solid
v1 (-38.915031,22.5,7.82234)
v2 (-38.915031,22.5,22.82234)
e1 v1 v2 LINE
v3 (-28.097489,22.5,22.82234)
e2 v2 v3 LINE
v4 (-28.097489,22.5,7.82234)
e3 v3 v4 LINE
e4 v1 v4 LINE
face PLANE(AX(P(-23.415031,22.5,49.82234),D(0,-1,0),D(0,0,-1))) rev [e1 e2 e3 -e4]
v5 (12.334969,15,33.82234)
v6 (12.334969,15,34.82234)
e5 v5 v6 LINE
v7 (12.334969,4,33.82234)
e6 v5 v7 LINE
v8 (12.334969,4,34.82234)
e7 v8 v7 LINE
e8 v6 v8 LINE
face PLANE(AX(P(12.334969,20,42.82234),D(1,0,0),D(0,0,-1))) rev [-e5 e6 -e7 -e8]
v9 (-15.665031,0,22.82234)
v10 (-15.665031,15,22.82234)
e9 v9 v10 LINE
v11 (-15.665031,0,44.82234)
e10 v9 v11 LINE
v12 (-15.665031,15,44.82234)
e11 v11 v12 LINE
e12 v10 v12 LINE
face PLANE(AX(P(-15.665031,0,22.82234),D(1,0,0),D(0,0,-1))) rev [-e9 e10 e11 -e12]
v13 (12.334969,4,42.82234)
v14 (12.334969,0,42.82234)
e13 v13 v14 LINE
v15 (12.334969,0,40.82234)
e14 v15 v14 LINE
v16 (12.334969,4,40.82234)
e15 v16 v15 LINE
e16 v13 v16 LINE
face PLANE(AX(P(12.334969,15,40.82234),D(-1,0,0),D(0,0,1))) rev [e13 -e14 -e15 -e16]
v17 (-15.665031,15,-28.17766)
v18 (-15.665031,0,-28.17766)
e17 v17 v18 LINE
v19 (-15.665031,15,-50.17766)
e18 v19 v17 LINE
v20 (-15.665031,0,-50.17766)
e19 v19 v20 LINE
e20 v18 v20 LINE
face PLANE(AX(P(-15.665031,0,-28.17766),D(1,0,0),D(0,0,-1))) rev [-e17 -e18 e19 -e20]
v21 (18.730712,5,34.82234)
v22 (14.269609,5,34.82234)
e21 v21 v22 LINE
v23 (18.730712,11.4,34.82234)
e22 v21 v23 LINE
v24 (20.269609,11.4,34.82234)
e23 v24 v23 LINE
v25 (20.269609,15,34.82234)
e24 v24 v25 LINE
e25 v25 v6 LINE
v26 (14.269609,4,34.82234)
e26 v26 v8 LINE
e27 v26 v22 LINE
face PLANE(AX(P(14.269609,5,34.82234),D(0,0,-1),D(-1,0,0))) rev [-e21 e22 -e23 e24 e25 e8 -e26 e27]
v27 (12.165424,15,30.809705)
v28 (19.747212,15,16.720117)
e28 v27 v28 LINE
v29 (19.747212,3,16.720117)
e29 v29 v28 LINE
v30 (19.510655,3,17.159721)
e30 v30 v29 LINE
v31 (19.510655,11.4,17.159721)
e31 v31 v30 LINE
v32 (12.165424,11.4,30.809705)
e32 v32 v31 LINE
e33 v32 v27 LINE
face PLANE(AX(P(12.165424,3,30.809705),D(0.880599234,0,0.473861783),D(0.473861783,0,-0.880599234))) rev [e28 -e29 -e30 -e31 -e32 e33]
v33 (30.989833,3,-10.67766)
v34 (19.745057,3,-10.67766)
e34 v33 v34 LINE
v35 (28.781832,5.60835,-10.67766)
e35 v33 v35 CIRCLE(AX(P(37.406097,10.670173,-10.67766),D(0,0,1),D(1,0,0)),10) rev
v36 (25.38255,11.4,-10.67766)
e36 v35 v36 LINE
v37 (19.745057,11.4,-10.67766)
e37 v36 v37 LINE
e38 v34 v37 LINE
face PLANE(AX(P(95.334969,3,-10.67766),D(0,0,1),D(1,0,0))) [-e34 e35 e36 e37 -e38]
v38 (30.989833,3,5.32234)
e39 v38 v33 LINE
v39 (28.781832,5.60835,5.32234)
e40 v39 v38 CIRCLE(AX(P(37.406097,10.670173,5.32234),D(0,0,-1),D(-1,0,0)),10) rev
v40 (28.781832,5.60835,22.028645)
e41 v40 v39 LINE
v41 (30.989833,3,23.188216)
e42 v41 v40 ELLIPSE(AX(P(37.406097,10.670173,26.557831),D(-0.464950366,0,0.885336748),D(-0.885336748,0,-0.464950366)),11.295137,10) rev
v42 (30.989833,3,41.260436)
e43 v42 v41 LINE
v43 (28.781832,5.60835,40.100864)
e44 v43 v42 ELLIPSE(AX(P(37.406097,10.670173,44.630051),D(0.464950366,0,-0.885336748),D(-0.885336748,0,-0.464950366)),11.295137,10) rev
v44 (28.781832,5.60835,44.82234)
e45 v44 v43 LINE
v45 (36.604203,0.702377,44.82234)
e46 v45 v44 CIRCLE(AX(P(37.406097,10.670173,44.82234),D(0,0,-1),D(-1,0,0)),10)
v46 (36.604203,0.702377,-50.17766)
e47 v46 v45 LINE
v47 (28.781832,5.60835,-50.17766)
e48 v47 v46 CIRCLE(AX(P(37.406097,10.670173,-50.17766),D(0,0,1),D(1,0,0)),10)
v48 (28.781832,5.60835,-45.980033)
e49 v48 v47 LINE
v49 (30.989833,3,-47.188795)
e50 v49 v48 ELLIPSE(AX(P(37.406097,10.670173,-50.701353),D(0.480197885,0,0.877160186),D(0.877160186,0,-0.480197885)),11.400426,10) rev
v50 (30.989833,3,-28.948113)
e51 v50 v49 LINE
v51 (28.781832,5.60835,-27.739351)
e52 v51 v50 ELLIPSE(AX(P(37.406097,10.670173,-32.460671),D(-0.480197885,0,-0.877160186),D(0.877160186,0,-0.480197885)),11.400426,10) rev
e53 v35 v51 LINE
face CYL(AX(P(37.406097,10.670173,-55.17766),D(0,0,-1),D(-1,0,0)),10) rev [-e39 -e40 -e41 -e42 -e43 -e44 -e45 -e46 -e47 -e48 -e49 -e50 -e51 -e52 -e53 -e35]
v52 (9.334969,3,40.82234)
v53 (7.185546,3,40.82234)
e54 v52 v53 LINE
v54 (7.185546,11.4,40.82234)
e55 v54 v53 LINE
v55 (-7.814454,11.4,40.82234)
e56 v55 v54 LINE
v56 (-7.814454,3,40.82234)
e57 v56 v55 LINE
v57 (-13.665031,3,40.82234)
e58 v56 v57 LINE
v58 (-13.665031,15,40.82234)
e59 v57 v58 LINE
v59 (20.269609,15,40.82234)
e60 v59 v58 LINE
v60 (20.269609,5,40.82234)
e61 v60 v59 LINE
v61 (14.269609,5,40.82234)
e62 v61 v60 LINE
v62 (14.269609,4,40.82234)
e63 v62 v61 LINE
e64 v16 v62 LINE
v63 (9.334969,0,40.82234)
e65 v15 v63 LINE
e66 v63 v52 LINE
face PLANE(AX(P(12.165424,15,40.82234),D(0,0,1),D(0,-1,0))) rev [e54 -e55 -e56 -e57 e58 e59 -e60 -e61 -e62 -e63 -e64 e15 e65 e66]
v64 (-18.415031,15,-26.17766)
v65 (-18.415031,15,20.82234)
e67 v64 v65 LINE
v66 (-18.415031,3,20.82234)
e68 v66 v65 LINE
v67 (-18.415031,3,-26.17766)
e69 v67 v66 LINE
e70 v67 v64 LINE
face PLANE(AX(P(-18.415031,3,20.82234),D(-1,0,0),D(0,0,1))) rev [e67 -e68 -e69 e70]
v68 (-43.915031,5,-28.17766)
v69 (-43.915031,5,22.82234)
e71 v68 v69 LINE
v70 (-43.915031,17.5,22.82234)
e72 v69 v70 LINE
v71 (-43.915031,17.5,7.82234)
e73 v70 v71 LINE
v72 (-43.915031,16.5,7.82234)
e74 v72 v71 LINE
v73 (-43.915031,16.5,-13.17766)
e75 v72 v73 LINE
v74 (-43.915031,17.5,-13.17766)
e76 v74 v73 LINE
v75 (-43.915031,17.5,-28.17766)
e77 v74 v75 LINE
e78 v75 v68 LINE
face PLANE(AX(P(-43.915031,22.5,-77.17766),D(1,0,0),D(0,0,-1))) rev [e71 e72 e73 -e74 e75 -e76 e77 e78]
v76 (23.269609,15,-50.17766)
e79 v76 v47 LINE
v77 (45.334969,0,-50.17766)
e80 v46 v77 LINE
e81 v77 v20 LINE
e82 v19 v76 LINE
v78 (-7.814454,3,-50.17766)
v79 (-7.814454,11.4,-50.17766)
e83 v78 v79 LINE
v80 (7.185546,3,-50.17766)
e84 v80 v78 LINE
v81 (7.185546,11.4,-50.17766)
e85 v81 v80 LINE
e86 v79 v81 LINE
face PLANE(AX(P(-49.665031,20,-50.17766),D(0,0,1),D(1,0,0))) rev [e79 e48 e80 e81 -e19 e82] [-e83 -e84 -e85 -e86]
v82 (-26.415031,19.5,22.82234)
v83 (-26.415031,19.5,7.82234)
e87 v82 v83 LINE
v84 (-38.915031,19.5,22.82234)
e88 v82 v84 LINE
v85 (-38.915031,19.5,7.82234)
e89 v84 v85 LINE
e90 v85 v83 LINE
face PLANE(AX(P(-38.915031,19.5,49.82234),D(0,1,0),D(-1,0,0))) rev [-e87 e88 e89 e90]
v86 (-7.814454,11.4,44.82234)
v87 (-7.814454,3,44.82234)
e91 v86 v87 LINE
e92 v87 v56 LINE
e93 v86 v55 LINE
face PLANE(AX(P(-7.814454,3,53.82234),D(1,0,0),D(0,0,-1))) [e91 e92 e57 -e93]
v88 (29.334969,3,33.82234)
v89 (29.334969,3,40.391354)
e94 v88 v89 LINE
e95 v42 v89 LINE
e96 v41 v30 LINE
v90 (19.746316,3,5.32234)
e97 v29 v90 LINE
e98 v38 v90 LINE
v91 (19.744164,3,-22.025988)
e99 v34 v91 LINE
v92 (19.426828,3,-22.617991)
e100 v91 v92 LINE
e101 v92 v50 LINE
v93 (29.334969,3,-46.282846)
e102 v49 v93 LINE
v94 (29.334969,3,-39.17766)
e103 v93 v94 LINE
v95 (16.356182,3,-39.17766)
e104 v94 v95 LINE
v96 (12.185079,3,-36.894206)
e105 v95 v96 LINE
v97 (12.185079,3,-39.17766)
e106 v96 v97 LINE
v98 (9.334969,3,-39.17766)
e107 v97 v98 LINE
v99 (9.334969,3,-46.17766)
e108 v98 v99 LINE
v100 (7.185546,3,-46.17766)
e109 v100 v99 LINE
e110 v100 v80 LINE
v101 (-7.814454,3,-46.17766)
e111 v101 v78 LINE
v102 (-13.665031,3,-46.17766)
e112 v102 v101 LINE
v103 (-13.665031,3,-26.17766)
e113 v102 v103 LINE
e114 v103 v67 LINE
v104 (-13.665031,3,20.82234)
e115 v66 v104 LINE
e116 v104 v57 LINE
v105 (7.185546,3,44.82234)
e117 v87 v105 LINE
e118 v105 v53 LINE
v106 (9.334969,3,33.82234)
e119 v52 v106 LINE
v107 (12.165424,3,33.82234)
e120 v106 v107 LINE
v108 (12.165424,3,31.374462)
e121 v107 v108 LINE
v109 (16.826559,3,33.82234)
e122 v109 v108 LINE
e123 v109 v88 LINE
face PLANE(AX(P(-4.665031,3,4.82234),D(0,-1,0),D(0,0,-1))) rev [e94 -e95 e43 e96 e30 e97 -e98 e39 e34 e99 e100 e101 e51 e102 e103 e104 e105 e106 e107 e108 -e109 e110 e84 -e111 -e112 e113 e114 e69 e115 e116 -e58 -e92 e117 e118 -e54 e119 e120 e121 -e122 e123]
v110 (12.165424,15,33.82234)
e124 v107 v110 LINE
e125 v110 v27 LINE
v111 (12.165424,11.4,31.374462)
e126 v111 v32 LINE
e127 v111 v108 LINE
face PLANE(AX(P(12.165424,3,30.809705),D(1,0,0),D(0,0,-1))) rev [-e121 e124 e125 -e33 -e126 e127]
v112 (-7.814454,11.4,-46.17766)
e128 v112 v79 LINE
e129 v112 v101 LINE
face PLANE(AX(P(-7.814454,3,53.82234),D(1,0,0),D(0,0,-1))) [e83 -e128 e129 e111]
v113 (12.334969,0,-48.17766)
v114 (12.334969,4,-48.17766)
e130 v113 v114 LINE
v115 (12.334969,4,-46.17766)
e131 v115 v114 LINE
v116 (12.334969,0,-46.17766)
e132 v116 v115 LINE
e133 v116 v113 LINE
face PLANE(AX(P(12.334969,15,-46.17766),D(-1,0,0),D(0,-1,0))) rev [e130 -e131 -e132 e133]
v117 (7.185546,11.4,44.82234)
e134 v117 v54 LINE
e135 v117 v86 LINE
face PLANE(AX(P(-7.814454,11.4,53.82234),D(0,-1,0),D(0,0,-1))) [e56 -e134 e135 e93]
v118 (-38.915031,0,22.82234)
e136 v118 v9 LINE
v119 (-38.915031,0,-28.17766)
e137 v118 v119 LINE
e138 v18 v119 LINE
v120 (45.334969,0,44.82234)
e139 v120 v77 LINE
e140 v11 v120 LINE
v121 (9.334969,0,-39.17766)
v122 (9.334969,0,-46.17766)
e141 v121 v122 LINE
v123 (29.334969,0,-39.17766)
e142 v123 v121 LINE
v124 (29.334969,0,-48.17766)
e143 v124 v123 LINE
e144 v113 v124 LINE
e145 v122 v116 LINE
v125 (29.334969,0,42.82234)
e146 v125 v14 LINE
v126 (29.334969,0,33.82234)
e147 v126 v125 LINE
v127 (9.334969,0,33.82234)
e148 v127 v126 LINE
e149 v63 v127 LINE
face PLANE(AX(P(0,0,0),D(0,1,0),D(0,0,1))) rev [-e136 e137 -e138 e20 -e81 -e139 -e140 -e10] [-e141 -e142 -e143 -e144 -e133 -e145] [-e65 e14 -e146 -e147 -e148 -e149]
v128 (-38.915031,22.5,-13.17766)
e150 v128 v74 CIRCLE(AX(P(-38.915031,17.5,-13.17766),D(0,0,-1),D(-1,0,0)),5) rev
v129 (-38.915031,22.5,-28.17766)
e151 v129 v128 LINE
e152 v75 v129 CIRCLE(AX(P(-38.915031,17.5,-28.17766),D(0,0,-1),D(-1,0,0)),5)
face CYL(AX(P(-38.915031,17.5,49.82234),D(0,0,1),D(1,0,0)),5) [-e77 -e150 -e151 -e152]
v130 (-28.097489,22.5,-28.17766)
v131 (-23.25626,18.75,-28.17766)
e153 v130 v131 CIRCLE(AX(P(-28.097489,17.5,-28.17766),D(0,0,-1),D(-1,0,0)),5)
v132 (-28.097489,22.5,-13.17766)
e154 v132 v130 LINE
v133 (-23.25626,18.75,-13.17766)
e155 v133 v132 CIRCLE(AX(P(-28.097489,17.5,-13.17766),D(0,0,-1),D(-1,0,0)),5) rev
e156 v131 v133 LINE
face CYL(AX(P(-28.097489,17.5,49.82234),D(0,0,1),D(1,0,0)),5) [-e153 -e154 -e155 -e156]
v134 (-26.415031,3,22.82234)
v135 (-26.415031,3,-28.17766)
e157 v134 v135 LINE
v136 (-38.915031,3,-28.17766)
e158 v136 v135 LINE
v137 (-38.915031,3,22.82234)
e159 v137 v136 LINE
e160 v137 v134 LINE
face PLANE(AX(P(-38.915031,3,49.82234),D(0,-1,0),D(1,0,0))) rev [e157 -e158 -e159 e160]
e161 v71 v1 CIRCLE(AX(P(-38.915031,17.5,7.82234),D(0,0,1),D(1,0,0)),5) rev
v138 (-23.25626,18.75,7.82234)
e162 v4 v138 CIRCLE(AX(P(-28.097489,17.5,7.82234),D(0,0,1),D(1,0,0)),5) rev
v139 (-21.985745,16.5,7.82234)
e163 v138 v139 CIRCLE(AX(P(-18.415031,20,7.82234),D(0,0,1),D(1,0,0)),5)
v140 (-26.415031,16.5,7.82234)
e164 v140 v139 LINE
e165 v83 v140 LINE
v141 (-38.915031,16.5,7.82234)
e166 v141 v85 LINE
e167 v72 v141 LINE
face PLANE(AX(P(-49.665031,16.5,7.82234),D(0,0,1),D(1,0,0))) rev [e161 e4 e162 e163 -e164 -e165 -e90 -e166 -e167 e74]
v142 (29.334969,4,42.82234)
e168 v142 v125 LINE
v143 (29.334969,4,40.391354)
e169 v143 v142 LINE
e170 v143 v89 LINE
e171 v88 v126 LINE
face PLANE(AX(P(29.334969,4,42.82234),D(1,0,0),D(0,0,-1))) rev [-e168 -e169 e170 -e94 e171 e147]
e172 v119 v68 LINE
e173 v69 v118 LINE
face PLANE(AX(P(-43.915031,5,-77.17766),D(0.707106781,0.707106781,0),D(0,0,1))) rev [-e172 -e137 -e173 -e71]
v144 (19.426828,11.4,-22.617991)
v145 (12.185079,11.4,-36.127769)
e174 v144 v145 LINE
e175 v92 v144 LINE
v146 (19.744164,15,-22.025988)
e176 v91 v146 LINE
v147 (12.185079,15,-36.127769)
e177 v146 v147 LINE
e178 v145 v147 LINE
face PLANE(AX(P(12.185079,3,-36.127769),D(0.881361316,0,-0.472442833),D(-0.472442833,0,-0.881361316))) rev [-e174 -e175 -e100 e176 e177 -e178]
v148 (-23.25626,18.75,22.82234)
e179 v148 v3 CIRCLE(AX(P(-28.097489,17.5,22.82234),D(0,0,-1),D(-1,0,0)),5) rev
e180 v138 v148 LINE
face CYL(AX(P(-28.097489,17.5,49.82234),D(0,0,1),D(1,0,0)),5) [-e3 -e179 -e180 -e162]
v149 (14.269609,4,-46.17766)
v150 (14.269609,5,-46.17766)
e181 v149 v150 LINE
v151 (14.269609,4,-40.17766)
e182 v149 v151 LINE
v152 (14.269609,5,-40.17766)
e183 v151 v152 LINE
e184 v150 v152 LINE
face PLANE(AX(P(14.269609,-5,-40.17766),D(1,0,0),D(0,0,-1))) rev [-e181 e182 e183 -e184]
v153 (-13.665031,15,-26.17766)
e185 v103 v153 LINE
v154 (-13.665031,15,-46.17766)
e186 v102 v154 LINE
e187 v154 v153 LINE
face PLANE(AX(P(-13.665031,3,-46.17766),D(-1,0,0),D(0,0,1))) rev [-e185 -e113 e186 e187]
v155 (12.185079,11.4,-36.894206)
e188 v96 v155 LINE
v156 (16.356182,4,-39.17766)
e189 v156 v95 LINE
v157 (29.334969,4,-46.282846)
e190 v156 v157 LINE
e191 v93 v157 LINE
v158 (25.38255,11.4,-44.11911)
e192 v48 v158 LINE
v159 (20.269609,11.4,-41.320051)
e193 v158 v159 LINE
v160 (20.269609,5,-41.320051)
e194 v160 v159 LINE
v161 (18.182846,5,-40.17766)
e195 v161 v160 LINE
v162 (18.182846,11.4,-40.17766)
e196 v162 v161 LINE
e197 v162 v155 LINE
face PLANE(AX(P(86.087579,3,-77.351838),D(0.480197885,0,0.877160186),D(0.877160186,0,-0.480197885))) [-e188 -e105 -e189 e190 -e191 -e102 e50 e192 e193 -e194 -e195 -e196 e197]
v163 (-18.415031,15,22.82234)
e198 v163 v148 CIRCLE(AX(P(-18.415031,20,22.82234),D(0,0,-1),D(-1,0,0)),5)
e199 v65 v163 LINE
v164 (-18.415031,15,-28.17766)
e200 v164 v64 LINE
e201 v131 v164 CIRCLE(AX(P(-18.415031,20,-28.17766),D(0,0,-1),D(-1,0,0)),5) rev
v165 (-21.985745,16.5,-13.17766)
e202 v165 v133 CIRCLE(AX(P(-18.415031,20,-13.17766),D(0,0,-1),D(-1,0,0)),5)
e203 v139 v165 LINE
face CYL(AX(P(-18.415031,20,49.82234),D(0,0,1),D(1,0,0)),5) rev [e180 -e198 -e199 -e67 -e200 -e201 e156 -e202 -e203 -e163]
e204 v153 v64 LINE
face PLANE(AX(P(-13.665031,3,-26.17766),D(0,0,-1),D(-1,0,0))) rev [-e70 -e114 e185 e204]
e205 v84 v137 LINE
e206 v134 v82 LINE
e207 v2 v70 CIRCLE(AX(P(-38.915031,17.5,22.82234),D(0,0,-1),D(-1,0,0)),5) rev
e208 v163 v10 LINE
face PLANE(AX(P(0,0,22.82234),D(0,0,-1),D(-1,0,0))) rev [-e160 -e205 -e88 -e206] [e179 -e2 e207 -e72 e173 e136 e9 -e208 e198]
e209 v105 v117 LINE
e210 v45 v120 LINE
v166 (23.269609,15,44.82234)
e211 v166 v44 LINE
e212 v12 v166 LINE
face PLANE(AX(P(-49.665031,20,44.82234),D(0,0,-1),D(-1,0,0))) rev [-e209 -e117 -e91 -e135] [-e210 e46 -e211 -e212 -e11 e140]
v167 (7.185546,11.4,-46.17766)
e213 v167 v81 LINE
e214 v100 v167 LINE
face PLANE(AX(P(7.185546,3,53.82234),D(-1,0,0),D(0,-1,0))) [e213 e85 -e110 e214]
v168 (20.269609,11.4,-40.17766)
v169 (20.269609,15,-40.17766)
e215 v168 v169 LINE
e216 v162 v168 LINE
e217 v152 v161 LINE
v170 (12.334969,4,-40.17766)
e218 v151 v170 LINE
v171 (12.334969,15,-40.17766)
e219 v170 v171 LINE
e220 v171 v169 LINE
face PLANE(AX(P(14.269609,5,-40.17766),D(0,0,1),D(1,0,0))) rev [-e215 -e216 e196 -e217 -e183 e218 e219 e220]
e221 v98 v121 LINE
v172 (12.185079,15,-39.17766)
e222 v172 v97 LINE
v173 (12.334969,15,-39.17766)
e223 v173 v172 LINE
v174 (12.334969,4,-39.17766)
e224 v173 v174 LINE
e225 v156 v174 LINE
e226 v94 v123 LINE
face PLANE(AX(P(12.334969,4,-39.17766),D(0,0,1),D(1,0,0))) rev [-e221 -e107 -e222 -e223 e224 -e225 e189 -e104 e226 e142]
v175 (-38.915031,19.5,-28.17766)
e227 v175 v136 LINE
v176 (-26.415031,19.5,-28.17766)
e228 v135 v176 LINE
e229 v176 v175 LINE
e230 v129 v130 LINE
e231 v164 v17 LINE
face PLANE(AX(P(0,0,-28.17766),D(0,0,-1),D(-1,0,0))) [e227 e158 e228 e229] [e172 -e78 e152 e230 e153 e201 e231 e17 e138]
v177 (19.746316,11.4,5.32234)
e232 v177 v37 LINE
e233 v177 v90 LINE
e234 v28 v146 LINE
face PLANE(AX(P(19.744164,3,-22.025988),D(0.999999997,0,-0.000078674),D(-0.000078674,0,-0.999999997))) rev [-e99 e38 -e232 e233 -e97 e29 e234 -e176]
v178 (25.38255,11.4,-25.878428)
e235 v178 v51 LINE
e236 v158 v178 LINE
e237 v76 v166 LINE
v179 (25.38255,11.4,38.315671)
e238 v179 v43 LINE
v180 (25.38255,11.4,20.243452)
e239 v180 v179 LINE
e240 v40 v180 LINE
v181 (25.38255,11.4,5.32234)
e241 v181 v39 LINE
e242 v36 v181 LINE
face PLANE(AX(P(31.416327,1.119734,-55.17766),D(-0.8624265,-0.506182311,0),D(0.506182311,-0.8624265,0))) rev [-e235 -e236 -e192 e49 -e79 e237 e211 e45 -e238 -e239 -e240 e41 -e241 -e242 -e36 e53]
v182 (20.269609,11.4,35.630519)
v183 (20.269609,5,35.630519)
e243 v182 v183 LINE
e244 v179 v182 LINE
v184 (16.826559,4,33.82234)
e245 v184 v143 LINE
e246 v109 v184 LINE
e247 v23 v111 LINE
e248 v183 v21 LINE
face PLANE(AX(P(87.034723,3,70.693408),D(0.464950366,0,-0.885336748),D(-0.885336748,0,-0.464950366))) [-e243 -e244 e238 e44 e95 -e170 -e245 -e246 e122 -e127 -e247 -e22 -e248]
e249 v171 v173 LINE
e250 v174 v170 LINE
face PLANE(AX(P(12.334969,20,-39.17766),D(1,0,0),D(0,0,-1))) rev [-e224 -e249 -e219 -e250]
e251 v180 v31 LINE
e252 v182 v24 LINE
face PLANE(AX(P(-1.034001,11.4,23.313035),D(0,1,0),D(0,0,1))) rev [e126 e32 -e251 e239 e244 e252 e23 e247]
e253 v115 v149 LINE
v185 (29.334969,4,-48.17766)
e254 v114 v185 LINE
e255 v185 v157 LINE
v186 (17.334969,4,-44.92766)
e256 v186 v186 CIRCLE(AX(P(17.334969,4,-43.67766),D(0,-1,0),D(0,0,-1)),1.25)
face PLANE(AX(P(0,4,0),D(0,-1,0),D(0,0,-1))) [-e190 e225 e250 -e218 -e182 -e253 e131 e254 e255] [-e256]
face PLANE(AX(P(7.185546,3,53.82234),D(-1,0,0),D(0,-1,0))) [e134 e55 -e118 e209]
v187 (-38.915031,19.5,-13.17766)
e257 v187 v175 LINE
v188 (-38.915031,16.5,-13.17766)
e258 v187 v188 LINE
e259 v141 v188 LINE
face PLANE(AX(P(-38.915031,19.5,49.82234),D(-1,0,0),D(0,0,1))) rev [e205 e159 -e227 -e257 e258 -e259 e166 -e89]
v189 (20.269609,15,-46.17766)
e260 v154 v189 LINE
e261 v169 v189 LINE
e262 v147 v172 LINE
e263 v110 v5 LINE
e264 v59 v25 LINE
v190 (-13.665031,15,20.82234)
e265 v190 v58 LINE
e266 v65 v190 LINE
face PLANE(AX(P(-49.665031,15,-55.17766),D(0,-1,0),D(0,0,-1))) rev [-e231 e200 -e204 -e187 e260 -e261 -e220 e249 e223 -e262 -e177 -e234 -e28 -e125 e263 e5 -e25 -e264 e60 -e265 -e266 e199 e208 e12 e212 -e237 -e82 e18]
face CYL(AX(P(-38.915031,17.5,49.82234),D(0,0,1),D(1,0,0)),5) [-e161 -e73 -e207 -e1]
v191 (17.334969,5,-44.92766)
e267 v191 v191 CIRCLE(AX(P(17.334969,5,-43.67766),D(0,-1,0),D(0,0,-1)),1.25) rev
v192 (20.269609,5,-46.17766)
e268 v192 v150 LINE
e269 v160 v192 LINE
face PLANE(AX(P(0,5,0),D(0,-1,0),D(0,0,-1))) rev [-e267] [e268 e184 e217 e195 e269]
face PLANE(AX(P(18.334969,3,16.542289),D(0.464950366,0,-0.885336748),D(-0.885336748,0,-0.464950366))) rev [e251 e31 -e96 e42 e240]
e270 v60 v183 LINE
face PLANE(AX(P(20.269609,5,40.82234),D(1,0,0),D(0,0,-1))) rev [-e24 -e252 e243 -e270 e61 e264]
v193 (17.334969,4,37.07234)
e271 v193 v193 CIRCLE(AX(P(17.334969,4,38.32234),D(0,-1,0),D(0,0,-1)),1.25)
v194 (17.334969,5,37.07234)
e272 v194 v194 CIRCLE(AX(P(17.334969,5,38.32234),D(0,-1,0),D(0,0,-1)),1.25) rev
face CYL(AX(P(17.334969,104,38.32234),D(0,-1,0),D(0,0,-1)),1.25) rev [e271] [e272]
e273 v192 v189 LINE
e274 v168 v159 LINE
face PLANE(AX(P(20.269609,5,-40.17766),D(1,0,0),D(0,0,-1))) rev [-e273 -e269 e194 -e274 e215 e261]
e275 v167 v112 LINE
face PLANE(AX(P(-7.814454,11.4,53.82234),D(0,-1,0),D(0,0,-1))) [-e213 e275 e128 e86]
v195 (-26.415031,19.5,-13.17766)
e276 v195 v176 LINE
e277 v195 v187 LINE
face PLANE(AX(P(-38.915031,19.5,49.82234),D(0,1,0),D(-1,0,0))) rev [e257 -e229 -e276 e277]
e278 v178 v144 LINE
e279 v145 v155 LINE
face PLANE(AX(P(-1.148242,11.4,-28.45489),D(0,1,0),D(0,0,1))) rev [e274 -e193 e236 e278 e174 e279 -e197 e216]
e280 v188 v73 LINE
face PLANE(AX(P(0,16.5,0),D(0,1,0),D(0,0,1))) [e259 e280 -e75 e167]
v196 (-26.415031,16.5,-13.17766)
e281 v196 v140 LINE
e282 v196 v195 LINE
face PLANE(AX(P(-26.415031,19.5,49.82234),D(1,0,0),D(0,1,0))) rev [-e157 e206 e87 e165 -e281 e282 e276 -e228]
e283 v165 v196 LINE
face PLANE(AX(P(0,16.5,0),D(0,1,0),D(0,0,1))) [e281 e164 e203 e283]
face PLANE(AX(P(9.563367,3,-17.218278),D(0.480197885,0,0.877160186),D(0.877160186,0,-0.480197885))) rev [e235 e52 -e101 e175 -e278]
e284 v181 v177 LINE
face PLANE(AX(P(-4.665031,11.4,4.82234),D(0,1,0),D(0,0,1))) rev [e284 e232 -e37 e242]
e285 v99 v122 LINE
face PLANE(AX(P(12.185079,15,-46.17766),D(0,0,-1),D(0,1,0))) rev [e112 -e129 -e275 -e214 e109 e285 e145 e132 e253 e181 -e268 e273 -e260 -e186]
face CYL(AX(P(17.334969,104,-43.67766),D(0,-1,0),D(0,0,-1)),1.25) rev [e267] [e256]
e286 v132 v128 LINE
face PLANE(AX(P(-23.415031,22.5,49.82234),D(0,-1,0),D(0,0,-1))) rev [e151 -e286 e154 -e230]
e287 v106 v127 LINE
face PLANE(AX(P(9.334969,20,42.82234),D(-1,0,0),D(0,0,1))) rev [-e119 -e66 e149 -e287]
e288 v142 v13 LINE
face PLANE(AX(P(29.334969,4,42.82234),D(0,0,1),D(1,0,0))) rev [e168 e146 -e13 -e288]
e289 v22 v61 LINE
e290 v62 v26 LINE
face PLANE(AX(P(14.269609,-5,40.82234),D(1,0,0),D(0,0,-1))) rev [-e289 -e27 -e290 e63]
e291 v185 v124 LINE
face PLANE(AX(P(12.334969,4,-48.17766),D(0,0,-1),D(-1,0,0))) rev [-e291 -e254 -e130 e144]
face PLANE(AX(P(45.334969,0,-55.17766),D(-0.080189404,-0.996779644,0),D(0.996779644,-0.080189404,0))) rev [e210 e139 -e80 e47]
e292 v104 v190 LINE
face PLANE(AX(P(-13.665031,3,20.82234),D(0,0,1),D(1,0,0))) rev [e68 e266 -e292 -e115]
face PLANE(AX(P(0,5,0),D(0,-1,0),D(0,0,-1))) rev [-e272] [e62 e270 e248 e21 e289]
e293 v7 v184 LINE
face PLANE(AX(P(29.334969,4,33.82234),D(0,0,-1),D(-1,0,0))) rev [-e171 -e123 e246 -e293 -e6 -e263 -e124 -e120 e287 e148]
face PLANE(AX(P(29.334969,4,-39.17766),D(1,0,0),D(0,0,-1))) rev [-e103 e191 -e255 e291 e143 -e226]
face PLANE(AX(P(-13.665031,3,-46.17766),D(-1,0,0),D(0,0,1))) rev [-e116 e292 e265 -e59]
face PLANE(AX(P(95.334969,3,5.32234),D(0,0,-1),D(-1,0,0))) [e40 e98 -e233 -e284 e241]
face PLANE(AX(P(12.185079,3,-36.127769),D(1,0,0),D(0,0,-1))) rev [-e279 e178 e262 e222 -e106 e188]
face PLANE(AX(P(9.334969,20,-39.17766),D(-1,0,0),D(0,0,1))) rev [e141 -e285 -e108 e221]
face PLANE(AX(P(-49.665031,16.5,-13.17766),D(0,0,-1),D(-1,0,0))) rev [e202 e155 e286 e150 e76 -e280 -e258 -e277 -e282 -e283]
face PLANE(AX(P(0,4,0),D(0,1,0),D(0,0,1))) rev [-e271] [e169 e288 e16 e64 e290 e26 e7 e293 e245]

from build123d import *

# Parameters (mm, degrees)
SKETCH1_W                = 95
SKETCH1_H                = 95
BOSS_EXTRUDE1_DEPTH      = 20
SKETCH2_W                = 15
SKETCH2_H                = 8.4
CUT_EXTRUDE1_DEPTH       = 50
CUT_EXTRUDE3_DEPTH       = 100
FILLET1_R                = 10
CUT_EXTRUDE4_DEPTH       = 17
SKETCH8_W                = 15
SKETCH8_H                = 8.4
CUT_EXTRUDE5_DEPTH       = 4
SKETCH9_W                = 15
SKETCH9_H                = 8.4
CUT_EXTRUDE6_DEPTH       = 4
SKETCH10_W               = 15
SKETCH10_H               = 8.4
CUT_EXTRUDE7_DEPTH       = 100
SKETCH11_W               = 15
SKETCH11_H               = 8.4
CUT_EXTRUDE8_DEPTH       = 100
SKETCH12_W               = 96.22761595
SKETCH12_H               = 5
CUT_EXTRUDE9_DEPTH       = 100
SKETCH14_W               = 16
SKETCH14_H               = 8.4
CUT_EXTRUDE10_DEPTH      = 100
SKETCH15_W               = 16
SKETCH15_H               = 8.4
CUT_EXTRUDE11_DEPTH      = 100
SKETCH16_W               = 16
SKETCH16_H               = 8.4
CUT_EXTRUDE13_DEPTH      = 100
CUT_EXTRUDE16_DEPTH      = 12
SKETCH21_W               = 23.779532914
SKETCH21_H               = 2
BOSS_EXTRUDE2_DEPTH      = 12
SKETCH23_W               = 23.759878039
SKETCH23_H               = 2
BOSS_EXTRUDE3_DEPTH      = 12
CUT_EXTRUDE19_DEPTH      = 100
CUT_EXTRUDE19_DEPTH_BACK = 100
SKETCH24_W               = 15
SKETCH24_H               = 8.4
SKETCH26_W               = 20
SKETCH26_H               = 95
BOSS_EXTRUDE4_DEPTH      = 20
SKETCH31_W               = 95
SKETCH31_H               = 20
BOSS_EXTRUDE6_DEPTH      = 10
SKETCH32_W               = 12.5
SKETCH32_H               = 16.5
CUT_EXTRUDE22_DEPTH      = 100
SKETCH33_W               = 3.75
SKETCH33_H               = 20
CUT_EXTRUDE23_DEPTH      = 100
SKETCH34_W               = 26.25
SKETCH34_H               = 12.5
CUT_EXTRUDE24_DEPTH      = 100
SKETCH35_W               = 34
SKETCH35_H               = 47.07285681
CUT_EXTRUDE25_DEPTH      = 22
SKETCH36_W               = 34
SKETCH36_H               = 30.604426896
CUT_EXTRUDE26_DEPTH      = 22
SKETCH37_W               = 26.25
SKETCH37_H               = 21
CUT_EXTRUDE28_DEPTH      = 6
SKETCH38_W               = 5.75
SKETCH38_H               = 22.5
CUT_EXTRUDE29_DEPTH      = 100
CHAMFER1_SIZE            = 5
SKETCH39_W               = 2.070576792
SKETCH39_H               = 87
CUT_EXTRUDE30_DEPTH      = 12
FILLET4_R                = 5
FILLET5_R                = 5
SKETCH40_W               = 4.75
SKETCH40_H               = 47
CUT_EXTRUDE31_DEPTH      = 12
FILLET6_R                = 5
SKETCH46_W               = 17
SKETCH46_H               = 9
CUT_EXTRUDE36_DEPTH      = 4
SKETCH47_R               = 1.25
CUT_EXTRUDE37_DEPTH      = 100
SKETCH48_W               = 6
SKETCH48_H               = 6
CUT_EXTRUDE40_DEPTH      = 10
SKETCH49_W               = 2.104185464
SKETCH49_H               = 6
SKETCH49_W_2             = 2.084530589
CUT_EXTRUDE41_DEPTH      = 20
SKETCH50_W               = 3
SKETCH50_H               = 9
CUT_EXTRUDE42_DEPTH      = 20
SKETCH51_W               = 3
SKETCH51_H               = 15
BOSS_EXTRUDE7_DEPTH      = 2
SKETCH52_W               = 3
SKETCH52_H               = 15
BOSS_EXTRUDE8_DEPTH      = 2


with BuildPart() as part:
    # Sketch1 → Boss-Extrude1 (new body)
    with BuildSketch(Plane(origin=(0, 0, 0), x_dir=(1, 0, 0), z_dir=(0, 1, 0))):
        with Locations((-2.165031067, 2.677660124)):
            Rectangle(SKETCH1_W, SKETCH1_H)
    extrude(amount=BOSS_EXTRUDE1_DEPTH)

    # Sketch2 → Cut-Extrude1 (cut)
    with BuildSketch(Plane(origin=(45.334968933, 0, 0), x_dir=(0, 0, -1), z_dir=(1, 0, 0))):
        with Locations((2.677660124, 7.2)):
            Rectangle(SKETCH2_W, SKETCH2_H)
    extrude(amount=-CUT_EXTRUDE1_DEPTH, mode=Mode.SUBTRACT)

    # Sketch6 → Cut-Extrude3 (cut)
    with BuildSketch(Plane.XY.offset(44.822339876)):
        Polygon((45.334968933, 0), (31.416327077, 1.119733542), (20.334968933, 20), (45.334968933, 20), align=None)
    extrude(amount=-CUT_EXTRUDE3_DEPTH, mode=Mode.SUBTRACT)

    # Fillet1
    # the kernel refuses this fillet: 10 mm, written as the material it adds along each edge
    with BuildSketch(Plane(origin=(31.416327077, 1.119733542, 44.822339876), x_dir=(0.9967796443594351, -0.08018940447888392, 0), z_dir=(0, 0, -1))) as fillet1_piece_1_section:
        with BuildLine():
            CenterArc((FILLET1_R * 0.52046366993, -FILLET1_R), FILLET1_R, 90, 54.990678882)
            Line((-FILLET1_R * 0.298595051697, -FILLET1_R * 0.426290308146), (0, 0))
            Line((0, 0), (FILLET1_R * 0.52046366993, 0))
        make_face()
    fillet1_piece_1 = extrude(amount=95, mode=Mode.PRIVATE)
    fillet1_piece_1 = split(fillet1_piece_1, bisect_by=Plane(origin=(32.462514907, 1.548685907, 4.822339876), z_dir=(0, 0, 1)), keep=Keep.TOP, mode=Mode.PRIVATE)
    fillet1_piece_1 = split(fillet1_piece_1, bisect_by=Plane(origin=(32.462514907, 3, 24.822339876), z_dir=(0, -1, 0)), keep=Keep.TOP, mode=Mode.PRIVATE)
    add(fillet1_piece_1)
    with BuildSketch(Plane(origin=(31.416327077, 1.119733542, 44.822339876), x_dir=(0.9967796443594351, -0.08018940447888392, 0), z_dir=(0, 0, -1))) as fillet1_piece_2_section:
        with BuildLine():
            CenterArc((FILLET1_R * 0.52046366993, -FILLET1_R), FILLET1_R, 90, 54.990678882)
            Line((-FILLET1_R * 0.298595051697, -FILLET1_R * 0.426290308146), (0, 0))
            Line((0, 0), (FILLET1_R * 0.52046366993, 0))
        make_face()
    fillet1_piece_2 = extrude(amount=95, mode=Mode.PRIVATE)
    fillet1_piece_2 = split(fillet1_piece_2, bisect_by=Plane(origin=(29.780943428, 3.965739863, 4.822339876), z_dir=(0, 0, 1)), keep=Keep.TOP, mode=Mode.PRIVATE)
    fillet1_piece_2 = split(fillet1_piece_2, bisect_by=Plane(origin=(29.780943428, 3, 24.822339876), z_dir=(0, 1, 0)), keep=Keep.TOP, mode=Mode.PRIVATE)
    add(fillet1_piece_2)
    with BuildSketch(Plane(origin=(31.416327077, 1.119733542, 44.822339876), x_dir=(0.9967796443594351, -0.08018940447888392, 0), z_dir=(0, 0, -1))) as fillet1_piece_3_section:
        with BuildLine():
            CenterArc((FILLET1_R * 0.52046366993, -FILLET1_R), FILLET1_R, 90, 54.990678882)
            Line((-FILLET1_R * 0.298595051697, -FILLET1_R * 0.426290308146), (0, 0))
            Line((0, 0), (FILLET1_R * 0.52046366993, 0))
        make_face()
    fillet1_piece_3 = extrude(amount=95, mode=Mode.PRIVATE)
    fillet1_piece_3 = split(fillet1_piece_3, bisect_by=Plane(origin=(32.462514907, 1.548685907, -10.177660124), z_dir=(0, 0, 1)), keep=Keep.TOP, mode=Mode.PRIVATE)
    fillet1_piece_3 = split(fillet1_piece_3, bisect_by=Plane(origin=(32.462514907, 1.548685907, 4.822339876), z_dir=(0, 0, -1)), keep=Keep.TOP, mode=Mode.PRIVATE)
    fillet1_piece_3 = split(fillet1_piece_3, bisect_by=Plane(origin=(32.462514907, 3, -2.677660124), z_dir=(0, -1, 0)), keep=Keep.TOP, mode=Mode.PRIVATE)
    add(fillet1_piece_3)
    with BuildSketch(Plane(origin=(31.416327077, 1.119733542, 44.822339876), x_dir=(0.9967796443594351, -0.08018940447888392, 0), z_dir=(0, 0, -1))) as fillet1_piece_4_section:
        with BuildLine():
            CenterArc((FILLET1_R * 0.52046366993, -FILLET1_R), FILLET1_R, 90, 54.990678882)
            Line((-FILLET1_R * 0.298595051697, -FILLET1_R * 0.426290308146), (0, 0))
            Line((0, 0), (FILLET1_R * 0.52046366993, 0))
        make_face()
    fillet1_piece_4 = extrude(amount=95, mode=Mode.PRIVATE)
    fillet1_piece_4 = split(fillet1_piece_4, bisect_by=Plane(origin=(32.462514907, 1.548685907, -10.177660124), z_dir=(0, 0, -1)), keep=Keep.TOP, mode=Mode.PRIVATE)
    fillet1_piece_4 = split(fillet1_piece_4, bisect_by=Plane(origin=(32.462514907, 3, -30.177660124), z_dir=(0, -1, 0)), keep=Keep.TOP, mode=Mode.PRIVATE)
    add(fillet1_piece_4)
    with BuildSketch(Plane(origin=(31.416327077, 1.119733542, 44.822339876), x_dir=(0.9967796443594351, -0.08018940447888392, 0), z_dir=(0, 0, -1))) as fillet1_piece_5_section:
        with BuildLine():
            CenterArc((FILLET1_R * 0.52046366993, -FILLET1_R), FILLET1_R, 90, 54.990678882)
            Line((-FILLET1_R * 0.298595051697, -FILLET1_R * 0.426290308146), (0, 0))
            Line((0, 0), (FILLET1_R * 0.52046366993, 0))
        make_face()
    fillet1_piece_5 = extrude(amount=95, mode=Mode.PRIVATE)
    fillet1_piece_5 = split(fillet1_piece_5, bisect_by=Plane(origin=(29.780943428, 3.965739863, -10.177660124), z_dir=(0, 0, -1)), keep=Keep.TOP, mode=Mode.PRIVATE)
    fillet1_piece_5 = split(fillet1_piece_5, bisect_by=Plane(origin=(29.780943428, 3, -30.177660124), z_dir=(0, 1, 0)), keep=Keep.TOP, mode=Mode.PRIVATE)
    add(fillet1_piece_5)

    # Sketch7 → Cut-Extrude4 (cut)
    with BuildSketch(Plane(origin=(0, 20, 0), x_dir=(1, 0, 0), z_dir=(0, 1, 0))):
        Polygon((11.360713437, -29.822339876), (18.334968933, -16.542288661), (9.481601456, -11.892784997), (2.50734596, -25.172836212), align=None)
        Polygon((18.334968933, 22.020257336), (11.132000664, 35.177660124), (2.360398805, 30.375681278), (9.563367074, 17.21827849), align=None)
    extrude(amount=-CUT_EXTRUDE4_DEPTH, mode=Mode.SUBTRACT)

    # Sketch8 → Cut-Extrude5 (cut)
    with BuildSketch(Plane(origin=(12.327397833, 0, 6.473952599), x_dir=(0.4649503663833249, 0, -0.885336747684186), z_dir=(0.8853367476841859, 0, 0.4649503663833248))):
        with Locations((-13.620645519, 7.2)):
            Rectangle(SKETCH8_W, SKETCH8_H)
    extrude(amount=-CUT_EXTRUDE5_DEPTH, mode=Mode.SUBTRACT)

    # Sketch9 → Cut-Extrude6 (cut)
    with BuildSketch(Plane(origin=(14.610669282, 0, -7.99855328), x_dir=(-0.48019788460400603, 0, -0.8771601858394155), z_dir=(0.8771601858394155, 0, -0.48019788460400603))):
        with Locations((18.010879722, 7.2)):
            Rectangle(SKETCH9_W, SKETCH9_H)
    extrude(amount=-CUT_EXTRUDE6_DEPTH, mode=Mode.SUBTRACT)

    # Sketch10 → Cut-Extrude7 (cut)
    with BuildSketch(Plane(origin=(8.786050842, 0, 4.614151134), x_dir=(0.464950366383325, 0, -0.8853367476841859), z_dir=(0.8853367476841859, 0, 0.464950366383325))):
        with Locations((-13.620645519, 7.2)):
            Rectangle(SKETCH10_W, SKETCH10_H)
    extrude(amount=CUT_EXTRUDE7_DEPTH, mode=Mode.SUBTRACT)

    # Sketch11 → Cut-Extrude8 (cut)
    with BuildSketch(Plane(origin=(11.102028539, 0, -6.077761742), x_dir=(-0.48019788460400603, 0, -0.8771601858394155), z_dir=(0.8771601858394155, 0, -0.48019788460400603))):
        with Locations((18.010879722, 7.2)):
            Rectangle(SKETCH11_W, SKETCH11_H)
    extrude(amount=CUT_EXTRUDE8_DEPTH, mode=Mode.SUBTRACT)

    # Sketch12 → Cut-Extrude9 (cut)
    with BuildSketch(Plane.XY.offset(44.822339876)):
        with Locations((-1.551223092, 17.5)):
            Rectangle(SKETCH12_W, SKETCH12_H)
    extrude(amount=-CUT_EXTRUDE9_DEPTH, mode=Mode.SUBTRACT)

    # Sketch14 → Cut-Extrude10 (cut)
    with BuildSketch(Plane(origin=(11.102028539, 0, -6.077761742), x_dir=(-0.48019788460400603, 0, -0.8771601858394155), z_dir=(0.8771601858394155, 0, -0.48019788460400603))):
        with Locations((18.510879722, 7.2)):
            Rectangle(SKETCH14_W, SKETCH14_H)
    extrude(amount=CUT_EXTRUDE10_DEPTH, mode=Mode.SUBTRACT)

    # Sketch15 → Cut-Extrude11 (cut)
    with BuildSketch(Plane(origin=(8.786050842, 0, 4.614151134), x_dir=(0.464950366383325, 0, -0.8853367476841859), z_dir=(0.8853367476841859, 0, 0.464950366383325))):
        with Locations((-14.120645519, 7.2)):
            Rectangle(SKETCH15_W, SKETCH15_H)
    extrude(amount=CUT_EXTRUDE11_DEPTH, mode=Mode.SUBTRACT)

    # Sketch16 → Cut-Extrude13 (cut)
    with BuildSketch(Plane(origin=(-4.665031067, 0, 0), x_dir=(0, 0, -1), z_dir=(1, 0, 0))):
        with Locations((2.677660124, 7.2)):
            Rectangle(SKETCH16_W, SKETCH16_H)
    extrude(amount=CUT_EXTRUDE13_DEPTH, mode=Mode.SUBTRACT)

    # Sketch19 → Cut-Extrude16 (cut)
    with BuildSketch(Plane(origin=(0, 15, 0), x_dir=(1, 0, 0), z_dir=(0, 1, 0))):
        Polygon((12.165423764, -30.809704699), (19.747212292, -16.720116958), (19.744163962, 22.025988312), (12.185078639, 36.127769372), (12.185078639, 48.177660124), (-11.594454275, 48.177660124), (-11.594454275, -42.822339876), (12.165423764, -42.822339876), align=None)
    extrude(amount=-CUT_EXTRUDE16_DEPTH, mode=Mode.SUBTRACT)

    # Sketch21 → Boss-Extrude2 (add)
    with BuildSketch(Plane(origin=(0, 3, 0), x_dir=(1, 0, 0), z_dir=(0, 1, 0))):
        with Locations((0.295312182, 47.177660124)):
            Rectangle(SKETCH21_W, SKETCH21_H)
    extrude(amount=BOSS_EXTRUDE2_DEPTH)

    # Sketch23 → Boss-Extrude3 (add)
    with BuildSketch(Plane(origin=(0, 3, 0), x_dir=(1, 0, 0), z_dir=(0, 1, 0))):
        with Locations((0.285484745, -41.822339876)):
            Rectangle(SKETCH23_W, SKETCH23_H)
    extrude(amount=BOSS_EXTRUDE3_DEPTH)

    # Sketch24 → Cut-Extrude19 (cut, two sides: drawn at the far end of the back side and taken through both)
    with BuildSketch(Plane.XY.offset(-46.177660124).offset(-CUT_EXTRUDE19_DEPTH_BACK)):
        with Locations((-0.314454275, 7.2)):
            Rectangle(SKETCH24_W, SKETCH24_H)
    extrude(amount=CUT_EXTRUDE19_DEPTH + CUT_EXTRUDE19_DEPTH_BACK, mode=Mode.SUBTRACT)

    # Sketch26 → Boss-Extrude4 (add)
    with BuildSketch(Plane(origin=(0, 15, 0), x_dir=(1, 0, 0), z_dir=(0, 1, 0))):
        with Locations((-39.665031067, 2.677660124)):
            Rectangle(SKETCH26_W, SKETCH26_H)
    extrude(amount=BOSS_EXTRUDE4_DEPTH)

    # Sketch31 → Boss-Extrude6 (add)
    with BuildSketch(Plane(origin=(-29.665031067, 0, 0), x_dir=(0, 0, -1), z_dir=(1, 0, 0))):
        with Locations((2.677660124, 25)):
            Rectangle(SKETCH31_W, SKETCH31_H)
    extrude(amount=BOSS_EXTRUDE6_DEPTH)

    # Sketch32 → Cut-Extrude22 (cut)
    with BuildSketch(Plane(origin=(0, 0, -50.177660124), x_dir=(-1, 0, 0), z_dir=(0, 0, -1))):
        with Locations((32.665031067, 11.25)):
            Rectangle(SKETCH32_W, SKETCH32_H)
    extrude(amount=-CUT_EXTRUDE22_DEPTH, mode=Mode.SUBTRACT)

    # Sketch33 → Cut-Extrude23 (cut)
    with BuildSketch(Plane(origin=(0, 0, -50.177660124), x_dir=(-1, 0, 0), z_dir=(0, 0, -1))):
        with Locations((21.540031067, 25)):
            Rectangle(SKETCH33_W, SKETCH33_H)
    extrude(amount=-CUT_EXTRUDE23_DEPTH, mode=Mode.SUBTRACT)

    # Sketch34 → Cut-Extrude24 (cut)
    with BuildSketch(Plane(origin=(0, 0, -50.177660124), x_dir=(-1, 0, 0), z_dir=(0, 0, -1))):
        with Locations((36.540031067, 28.75)):
            Rectangle(SKETCH34_W, SKETCH34_H)
    extrude(amount=-CUT_EXTRUDE24_DEPTH, mode=Mode.SUBTRACT)

    # Sketch35 → Cut-Extrude25 (cut)
    with BuildSketch(Plane(origin=(0, 0, -50.177660124), x_dir=(-1, 0, 0), z_dir=(0, 0, -1))):
        with Locations((32.665031067, 23.536428405)):
            Rectangle(SKETCH35_W, SKETCH35_H)
    extrude(amount=-CUT_EXTRUDE25_DEPTH, mode=Mode.SUBTRACT)

    # Sketch36 → Cut-Extrude26 (cut)
    with BuildSketch(Plane.XY.offset(44.822339876)):
        with Locations((-32.665031067, 15.302213448)):
            Rectangle(SKETCH36_W, SKETCH36_H)
    extrude(amount=-CUT_EXTRUDE26_DEPTH, mode=Mode.SUBTRACT)

    # Sketch37 → Cut-Extrude28 (cut)
    with BuildSketch(Plane(origin=(0, 22.5, 0), x_dir=(1, 0, 0), z_dir=(0, 1, 0))):
        with Locations((-36.540031067, 2.677660124)):
            Rectangle(SKETCH37_W, SKETCH37_H)
    extrude(amount=-CUT_EXTRUDE28_DEPTH, mode=Mode.SUBTRACT)

    # Sketch38 → Cut-Extrude29 (cut)
    with BuildSketch(Plane.XY.offset(22.822339876)):
        with Locations((-46.790031067, 11.25)):
            Rectangle(SKETCH38_W, SKETCH38_H)
    extrude(amount=-CUT_EXTRUDE29_DEPTH, mode=Mode.SUBTRACT)

    # Chamfer1
    chamfer1_edges = [part.edges().sort_by_distance(p)[0] for p in [
        (-43.915031067, 0, -2.677660124),
    ]]
    chamfer(chamfer1_edges, length=CHAMFER1_SIZE)

    # Sketch39 → Cut-Extrude30 (cut)
    with BuildSketch(Plane(origin=(0, 15, 0), x_dir=(1, 0, 0), z_dir=(0, 1, 0))):
        with Locations((-12.629742671, 2.677660124)):
            Rectangle(SKETCH39_W, SKETCH39_H)
    extrude(amount=-CUT_EXTRUDE30_DEPTH, mode=Mode.SUBTRACT)

    # Fillet4
    # the kernel refuses this fillet: 5 mm, written as the material it adds along each edge
    with BuildSketch(Plane(origin=(-23.415031067, 15, -28.177660124), x_dir=(1, 0, 0), z_dir=(0, 0, 1))) as fillet4_piece_1_section:
        with BuildLine():
            CenterArc((FILLET4_R, FILLET4_R), FILLET4_R, 180, 90)
            Line((0, FILLET4_R), (0, 0))
            Line((0, 0), (FILLET4_R, 0))
        make_face()
    fillet4_piece_1 = extrude(amount=51, mode=Mode.PRIVATE)
    fillet4_piece_1 = split(fillet4_piece_1, bisect_by=Plane(origin=(-21.940460429, 15.541584114, -13.177660124), z_dir=(0, 0, -1)), keep=Keep.TOP, mode=Mode.PRIVATE)
    fillet4_piece_1 = split(fillet4_piece_1, bisect_by=Plane(origin=(-21.940460429, 16.5, -20.677660124), z_dir=(0, -1, 0)), keep=Keep.TOP, mode=Mode.PRIVATE)
    add(fillet4_piece_1)
    with BuildSketch(Plane(origin=(-23.415031067, 15, -28.177660124), x_dir=(1, 0, 0), z_dir=(0, 0, 1))) as fillet4_piece_2_section:
        with BuildLine():
            CenterArc((FILLET4_R, FILLET4_R), FILLET4_R, 180, 90)
            Line((0, FILLET4_R), (0, 0))
            Line((0, 0), (FILLET4_R, 0))
        make_face()
    fillet4_piece_2 = extrude(amount=51, mode=Mode.PRIVATE)
    fillet4_piece_2 = split(fillet4_piece_2, bisect_by=Plane(origin=(-23.084676974, 17.513403735, -13.177660124), z_dir=(0, 0, -1)), keep=Keep.TOP, mode=Mode.PRIVATE)
    fillet4_piece_2 = split(fillet4_piece_2, bisect_by=Plane(origin=(-23.084676974, 16.5, -20.677660124), z_dir=(0, 1, 0)), keep=Keep.TOP, mode=Mode.PRIVATE)
    add(fillet4_piece_2)
    with BuildSketch(Plane(origin=(-23.415031067, 15, -28.177660124), x_dir=(1, 0, 0), z_dir=(0, 0, 1))) as fillet4_piece_3_section:
        with BuildLine():
            CenterArc((FILLET4_R, FILLET4_R), FILLET4_R, 180, 90)
            Line((0, FILLET4_R), (0, 0))
            Line((0, 0), (FILLET4_R, 0))
        make_face()
    fillet4_piece_3 = extrude(amount=51, mode=Mode.PRIVATE)
    fillet4_piece_3 = split(fillet4_piece_3, bisect_by=Plane(origin=(-21.940460429, 15.541584114, -13.177660124), z_dir=(0, 0, 1)), keep=Keep.TOP, mode=Mode.PRIVATE)
    fillet4_piece_3 = split(fillet4_piece_3, bisect_by=Plane(origin=(-21.940460429, 16.5, -2.677660124), z_dir=(0, -1, 0)), keep=Keep.TOP, mode=Mode.PRIVATE)
    fillet4_piece_3 = split(fillet4_piece_3, bisect_by=Plane(origin=(-21.940460429, 15.541584114, 7.822339876), z_dir=(0, 0, -1)), keep=Keep.TOP, mode=Mode.PRIVATE)
    add(fillet4_piece_3)
    with BuildSketch(Plane(origin=(-23.415031067, 15, -28.177660124), x_dir=(1, 0, 0), z_dir=(0, 0, 1))) as fillet4_piece_4_section:
        with BuildLine():
            CenterArc((FILLET4_R, FILLET4_R), FILLET4_R, 180, 90)
            Line((0, FILLET4_R), (0, 0))
            Line((0, 0), (FILLET4_R, 0))
        make_face()
    fillet4_piece_4 = extrude(amount=51, mode=Mode.PRIVATE)
    fillet4_piece_4 = split(fillet4_piece_4, bisect_by=Plane(origin=(-21.940460429, 16.5, 15.322339876), z_dir=(0, -1, 0)), keep=Keep.TOP, mode=Mode.PRIVATE)
    fillet4_piece_4 = split(fillet4_piece_4, bisect_by=Plane(origin=(-21.940460429, 15.541584114, 7.822339876), z_dir=(0, 0, 1)), keep=Keep.TOP, mode=Mode.PRIVATE)
    add(fillet4_piece_4)
    with BuildSketch(Plane(origin=(-23.415031067, 15, -28.177660124), x_dir=(1, 0, 0), z_dir=(0, 0, 1))) as fillet4_piece_5_section:
        with BuildLine():
            CenterArc((FILLET4_R, FILLET4_R), FILLET4_R, 180, 90)
            Line((0, FILLET4_R), (0, 0))
            Line((0, 0), (FILLET4_R, 0))
        make_face()
    fillet4_piece_5 = extrude(amount=51, mode=Mode.PRIVATE)
    fillet4_piece_5 = split(fillet4_piece_5, bisect_by=Plane(origin=(-23.084676974, 16.5, 15.322339876), z_dir=(0, 1, 0)), keep=Keep.TOP, mode=Mode.PRIVATE)
    fillet4_piece_5 = split(fillet4_piece_5, bisect_by=Plane(origin=(-23.084676974, 17.513403735, 7.822339876), z_dir=(0, 0, 1)), keep=Keep.TOP, mode=Mode.PRIVATE)
    add(fillet4_piece_5)

    # Fillet5
    fillet5_edges = [part.edges().sort_by_distance(p)[0] for p in [
        (-23.415031067, 22.5, 15.322339876),
        (-23.415031067, 22.5, -20.677660124),
    ]]
    fillet(fillet5_edges, radius=FILLET5_R)

    # Sketch40 → Cut-Extrude31 (cut)
    with BuildSketch(Plane(origin=(0, 15, 0), x_dir=(1, 0, 0), z_dir=(0, 1, 0))):
        with Locations((-16.040031067, 2.677660124)):
            Rectangle(SKETCH40_W, SKETCH40_H)
    extrude(amount=-CUT_EXTRUDE31_DEPTH, mode=Mode.SUBTRACT)

    # Fillet6
    fillet6_edges = [part.edges().sort_by_distance(p)[0] for p in [
        (-43.915031067, 22.5, -20.677660124),
        (-43.915031067, 22.5, 15.322339876),
    ]]
    fillet(fillet6_edges, radius=FILLET6_R)

    # Sketch46 → Cut-Extrude36 (cut)
    with BuildSketch(Plane(origin=(0, 0, 0), x_dir=(-1, 0, 0), z_dir=(0, -1, 0))):
        with Locations((-20.834968933, -38.322339876)):
            Rectangle(SKETCH46_W, SKETCH46_H)
        with Locations((-20.834968933, 43.677660124)):
            Rectangle(SKETCH46_W, SKETCH46_H)
    extrude(amount=-CUT_EXTRUDE36_DEPTH, mode=Mode.SUBTRACT)

    # Sketch47 → Cut-Extrude37 (cut)
    with BuildSketch(Plane(origin=(0, 4, 0), x_dir=(-1, 0, 0), z_dir=(0, -1, 0))):
        with Locations(Location((-17.334968933, -38.322339876, 0), (0, 0, 90))):
            Circle(SKETCH47_R)
        with Locations(Location((-17.334968933, 43.677660124, 0), (0, 0, 90))):
            Circle(SKETCH47_R)
    extrude(amount=-CUT_EXTRUDE37_DEPTH, mode=Mode.SUBTRACT)

    # Sketch48 → Cut-Extrude40 (cut)
    with BuildSketch(Plane(origin=(0, 15, 0), x_dir=(1, 0, 0), z_dir=(0, 1, 0))):
        with Locations((17.269609228, -37.822339876)):
            Rectangle(SKETCH48_W, SKETCH48_H)
        with Locations((17.269609228, 43.177660124)):
            Rectangle(SKETCH48_W, SKETCH48_H)
    extrude(amount=-CUT_EXTRUDE40_DEPTH, mode=Mode.SUBTRACT)

    # Sketch49 → Cut-Extrude41 (cut)
    with BuildSketch(Plane(origin=(0, 15, 0), x_dir=(1, 0, 0), z_dir=(0, 1, 0))):
        with Locations((13.217516496, -37.822339876)):
            Rectangle(SKETCH49_W, SKETCH49_H)
        with Locations((13.227343934, 43.177660124)):
            Rectangle(SKETCH49_W_2, SKETCH49_H)
    extrude(amount=-CUT_EXTRUDE41_DEPTH, mode=Mode.SUBTRACT)

    # Sketch50 → Cut-Extrude42 (cut)
    with BuildSketch(Plane(origin=(0, 0, 0), x_dir=(-1, 0, 0), z_dir=(0, -1, 0))):
        with Locations((-10.834968933, -38.322339876)):
            Rectangle(SKETCH50_W, SKETCH50_H)
        with Locations((-10.834968933, 43.677660124)):
            Rectangle(SKETCH50_W, SKETCH50_H)
    extrude(amount=-CUT_EXTRUDE42_DEPTH, mode=Mode.SUBTRACT)

    # Sketch51 → Boss-Extrude7 (add)
    with BuildSketch(Plane(origin=(0, 0, 42.822339876), x_dir=(-1, 0, 0), z_dir=(0, 0, -1))):
        with Locations((-10.834968933, 7.5)):
            Rectangle(SKETCH51_W, SKETCH51_H)
    extrude(amount=BOSS_EXTRUDE7_DEPTH)

    # Sketch52 → Boss-Extrude8 (add)
    with BuildSketch(Plane.XY.offset(-48.177660124)):
        with Locations((10.834968933, 7.5)):
            Rectangle(SKETCH52_W, SKETCH52_H)
    extrude(amount=BOSS_EXTRUDE8_DEPTH)


solid = part.part
